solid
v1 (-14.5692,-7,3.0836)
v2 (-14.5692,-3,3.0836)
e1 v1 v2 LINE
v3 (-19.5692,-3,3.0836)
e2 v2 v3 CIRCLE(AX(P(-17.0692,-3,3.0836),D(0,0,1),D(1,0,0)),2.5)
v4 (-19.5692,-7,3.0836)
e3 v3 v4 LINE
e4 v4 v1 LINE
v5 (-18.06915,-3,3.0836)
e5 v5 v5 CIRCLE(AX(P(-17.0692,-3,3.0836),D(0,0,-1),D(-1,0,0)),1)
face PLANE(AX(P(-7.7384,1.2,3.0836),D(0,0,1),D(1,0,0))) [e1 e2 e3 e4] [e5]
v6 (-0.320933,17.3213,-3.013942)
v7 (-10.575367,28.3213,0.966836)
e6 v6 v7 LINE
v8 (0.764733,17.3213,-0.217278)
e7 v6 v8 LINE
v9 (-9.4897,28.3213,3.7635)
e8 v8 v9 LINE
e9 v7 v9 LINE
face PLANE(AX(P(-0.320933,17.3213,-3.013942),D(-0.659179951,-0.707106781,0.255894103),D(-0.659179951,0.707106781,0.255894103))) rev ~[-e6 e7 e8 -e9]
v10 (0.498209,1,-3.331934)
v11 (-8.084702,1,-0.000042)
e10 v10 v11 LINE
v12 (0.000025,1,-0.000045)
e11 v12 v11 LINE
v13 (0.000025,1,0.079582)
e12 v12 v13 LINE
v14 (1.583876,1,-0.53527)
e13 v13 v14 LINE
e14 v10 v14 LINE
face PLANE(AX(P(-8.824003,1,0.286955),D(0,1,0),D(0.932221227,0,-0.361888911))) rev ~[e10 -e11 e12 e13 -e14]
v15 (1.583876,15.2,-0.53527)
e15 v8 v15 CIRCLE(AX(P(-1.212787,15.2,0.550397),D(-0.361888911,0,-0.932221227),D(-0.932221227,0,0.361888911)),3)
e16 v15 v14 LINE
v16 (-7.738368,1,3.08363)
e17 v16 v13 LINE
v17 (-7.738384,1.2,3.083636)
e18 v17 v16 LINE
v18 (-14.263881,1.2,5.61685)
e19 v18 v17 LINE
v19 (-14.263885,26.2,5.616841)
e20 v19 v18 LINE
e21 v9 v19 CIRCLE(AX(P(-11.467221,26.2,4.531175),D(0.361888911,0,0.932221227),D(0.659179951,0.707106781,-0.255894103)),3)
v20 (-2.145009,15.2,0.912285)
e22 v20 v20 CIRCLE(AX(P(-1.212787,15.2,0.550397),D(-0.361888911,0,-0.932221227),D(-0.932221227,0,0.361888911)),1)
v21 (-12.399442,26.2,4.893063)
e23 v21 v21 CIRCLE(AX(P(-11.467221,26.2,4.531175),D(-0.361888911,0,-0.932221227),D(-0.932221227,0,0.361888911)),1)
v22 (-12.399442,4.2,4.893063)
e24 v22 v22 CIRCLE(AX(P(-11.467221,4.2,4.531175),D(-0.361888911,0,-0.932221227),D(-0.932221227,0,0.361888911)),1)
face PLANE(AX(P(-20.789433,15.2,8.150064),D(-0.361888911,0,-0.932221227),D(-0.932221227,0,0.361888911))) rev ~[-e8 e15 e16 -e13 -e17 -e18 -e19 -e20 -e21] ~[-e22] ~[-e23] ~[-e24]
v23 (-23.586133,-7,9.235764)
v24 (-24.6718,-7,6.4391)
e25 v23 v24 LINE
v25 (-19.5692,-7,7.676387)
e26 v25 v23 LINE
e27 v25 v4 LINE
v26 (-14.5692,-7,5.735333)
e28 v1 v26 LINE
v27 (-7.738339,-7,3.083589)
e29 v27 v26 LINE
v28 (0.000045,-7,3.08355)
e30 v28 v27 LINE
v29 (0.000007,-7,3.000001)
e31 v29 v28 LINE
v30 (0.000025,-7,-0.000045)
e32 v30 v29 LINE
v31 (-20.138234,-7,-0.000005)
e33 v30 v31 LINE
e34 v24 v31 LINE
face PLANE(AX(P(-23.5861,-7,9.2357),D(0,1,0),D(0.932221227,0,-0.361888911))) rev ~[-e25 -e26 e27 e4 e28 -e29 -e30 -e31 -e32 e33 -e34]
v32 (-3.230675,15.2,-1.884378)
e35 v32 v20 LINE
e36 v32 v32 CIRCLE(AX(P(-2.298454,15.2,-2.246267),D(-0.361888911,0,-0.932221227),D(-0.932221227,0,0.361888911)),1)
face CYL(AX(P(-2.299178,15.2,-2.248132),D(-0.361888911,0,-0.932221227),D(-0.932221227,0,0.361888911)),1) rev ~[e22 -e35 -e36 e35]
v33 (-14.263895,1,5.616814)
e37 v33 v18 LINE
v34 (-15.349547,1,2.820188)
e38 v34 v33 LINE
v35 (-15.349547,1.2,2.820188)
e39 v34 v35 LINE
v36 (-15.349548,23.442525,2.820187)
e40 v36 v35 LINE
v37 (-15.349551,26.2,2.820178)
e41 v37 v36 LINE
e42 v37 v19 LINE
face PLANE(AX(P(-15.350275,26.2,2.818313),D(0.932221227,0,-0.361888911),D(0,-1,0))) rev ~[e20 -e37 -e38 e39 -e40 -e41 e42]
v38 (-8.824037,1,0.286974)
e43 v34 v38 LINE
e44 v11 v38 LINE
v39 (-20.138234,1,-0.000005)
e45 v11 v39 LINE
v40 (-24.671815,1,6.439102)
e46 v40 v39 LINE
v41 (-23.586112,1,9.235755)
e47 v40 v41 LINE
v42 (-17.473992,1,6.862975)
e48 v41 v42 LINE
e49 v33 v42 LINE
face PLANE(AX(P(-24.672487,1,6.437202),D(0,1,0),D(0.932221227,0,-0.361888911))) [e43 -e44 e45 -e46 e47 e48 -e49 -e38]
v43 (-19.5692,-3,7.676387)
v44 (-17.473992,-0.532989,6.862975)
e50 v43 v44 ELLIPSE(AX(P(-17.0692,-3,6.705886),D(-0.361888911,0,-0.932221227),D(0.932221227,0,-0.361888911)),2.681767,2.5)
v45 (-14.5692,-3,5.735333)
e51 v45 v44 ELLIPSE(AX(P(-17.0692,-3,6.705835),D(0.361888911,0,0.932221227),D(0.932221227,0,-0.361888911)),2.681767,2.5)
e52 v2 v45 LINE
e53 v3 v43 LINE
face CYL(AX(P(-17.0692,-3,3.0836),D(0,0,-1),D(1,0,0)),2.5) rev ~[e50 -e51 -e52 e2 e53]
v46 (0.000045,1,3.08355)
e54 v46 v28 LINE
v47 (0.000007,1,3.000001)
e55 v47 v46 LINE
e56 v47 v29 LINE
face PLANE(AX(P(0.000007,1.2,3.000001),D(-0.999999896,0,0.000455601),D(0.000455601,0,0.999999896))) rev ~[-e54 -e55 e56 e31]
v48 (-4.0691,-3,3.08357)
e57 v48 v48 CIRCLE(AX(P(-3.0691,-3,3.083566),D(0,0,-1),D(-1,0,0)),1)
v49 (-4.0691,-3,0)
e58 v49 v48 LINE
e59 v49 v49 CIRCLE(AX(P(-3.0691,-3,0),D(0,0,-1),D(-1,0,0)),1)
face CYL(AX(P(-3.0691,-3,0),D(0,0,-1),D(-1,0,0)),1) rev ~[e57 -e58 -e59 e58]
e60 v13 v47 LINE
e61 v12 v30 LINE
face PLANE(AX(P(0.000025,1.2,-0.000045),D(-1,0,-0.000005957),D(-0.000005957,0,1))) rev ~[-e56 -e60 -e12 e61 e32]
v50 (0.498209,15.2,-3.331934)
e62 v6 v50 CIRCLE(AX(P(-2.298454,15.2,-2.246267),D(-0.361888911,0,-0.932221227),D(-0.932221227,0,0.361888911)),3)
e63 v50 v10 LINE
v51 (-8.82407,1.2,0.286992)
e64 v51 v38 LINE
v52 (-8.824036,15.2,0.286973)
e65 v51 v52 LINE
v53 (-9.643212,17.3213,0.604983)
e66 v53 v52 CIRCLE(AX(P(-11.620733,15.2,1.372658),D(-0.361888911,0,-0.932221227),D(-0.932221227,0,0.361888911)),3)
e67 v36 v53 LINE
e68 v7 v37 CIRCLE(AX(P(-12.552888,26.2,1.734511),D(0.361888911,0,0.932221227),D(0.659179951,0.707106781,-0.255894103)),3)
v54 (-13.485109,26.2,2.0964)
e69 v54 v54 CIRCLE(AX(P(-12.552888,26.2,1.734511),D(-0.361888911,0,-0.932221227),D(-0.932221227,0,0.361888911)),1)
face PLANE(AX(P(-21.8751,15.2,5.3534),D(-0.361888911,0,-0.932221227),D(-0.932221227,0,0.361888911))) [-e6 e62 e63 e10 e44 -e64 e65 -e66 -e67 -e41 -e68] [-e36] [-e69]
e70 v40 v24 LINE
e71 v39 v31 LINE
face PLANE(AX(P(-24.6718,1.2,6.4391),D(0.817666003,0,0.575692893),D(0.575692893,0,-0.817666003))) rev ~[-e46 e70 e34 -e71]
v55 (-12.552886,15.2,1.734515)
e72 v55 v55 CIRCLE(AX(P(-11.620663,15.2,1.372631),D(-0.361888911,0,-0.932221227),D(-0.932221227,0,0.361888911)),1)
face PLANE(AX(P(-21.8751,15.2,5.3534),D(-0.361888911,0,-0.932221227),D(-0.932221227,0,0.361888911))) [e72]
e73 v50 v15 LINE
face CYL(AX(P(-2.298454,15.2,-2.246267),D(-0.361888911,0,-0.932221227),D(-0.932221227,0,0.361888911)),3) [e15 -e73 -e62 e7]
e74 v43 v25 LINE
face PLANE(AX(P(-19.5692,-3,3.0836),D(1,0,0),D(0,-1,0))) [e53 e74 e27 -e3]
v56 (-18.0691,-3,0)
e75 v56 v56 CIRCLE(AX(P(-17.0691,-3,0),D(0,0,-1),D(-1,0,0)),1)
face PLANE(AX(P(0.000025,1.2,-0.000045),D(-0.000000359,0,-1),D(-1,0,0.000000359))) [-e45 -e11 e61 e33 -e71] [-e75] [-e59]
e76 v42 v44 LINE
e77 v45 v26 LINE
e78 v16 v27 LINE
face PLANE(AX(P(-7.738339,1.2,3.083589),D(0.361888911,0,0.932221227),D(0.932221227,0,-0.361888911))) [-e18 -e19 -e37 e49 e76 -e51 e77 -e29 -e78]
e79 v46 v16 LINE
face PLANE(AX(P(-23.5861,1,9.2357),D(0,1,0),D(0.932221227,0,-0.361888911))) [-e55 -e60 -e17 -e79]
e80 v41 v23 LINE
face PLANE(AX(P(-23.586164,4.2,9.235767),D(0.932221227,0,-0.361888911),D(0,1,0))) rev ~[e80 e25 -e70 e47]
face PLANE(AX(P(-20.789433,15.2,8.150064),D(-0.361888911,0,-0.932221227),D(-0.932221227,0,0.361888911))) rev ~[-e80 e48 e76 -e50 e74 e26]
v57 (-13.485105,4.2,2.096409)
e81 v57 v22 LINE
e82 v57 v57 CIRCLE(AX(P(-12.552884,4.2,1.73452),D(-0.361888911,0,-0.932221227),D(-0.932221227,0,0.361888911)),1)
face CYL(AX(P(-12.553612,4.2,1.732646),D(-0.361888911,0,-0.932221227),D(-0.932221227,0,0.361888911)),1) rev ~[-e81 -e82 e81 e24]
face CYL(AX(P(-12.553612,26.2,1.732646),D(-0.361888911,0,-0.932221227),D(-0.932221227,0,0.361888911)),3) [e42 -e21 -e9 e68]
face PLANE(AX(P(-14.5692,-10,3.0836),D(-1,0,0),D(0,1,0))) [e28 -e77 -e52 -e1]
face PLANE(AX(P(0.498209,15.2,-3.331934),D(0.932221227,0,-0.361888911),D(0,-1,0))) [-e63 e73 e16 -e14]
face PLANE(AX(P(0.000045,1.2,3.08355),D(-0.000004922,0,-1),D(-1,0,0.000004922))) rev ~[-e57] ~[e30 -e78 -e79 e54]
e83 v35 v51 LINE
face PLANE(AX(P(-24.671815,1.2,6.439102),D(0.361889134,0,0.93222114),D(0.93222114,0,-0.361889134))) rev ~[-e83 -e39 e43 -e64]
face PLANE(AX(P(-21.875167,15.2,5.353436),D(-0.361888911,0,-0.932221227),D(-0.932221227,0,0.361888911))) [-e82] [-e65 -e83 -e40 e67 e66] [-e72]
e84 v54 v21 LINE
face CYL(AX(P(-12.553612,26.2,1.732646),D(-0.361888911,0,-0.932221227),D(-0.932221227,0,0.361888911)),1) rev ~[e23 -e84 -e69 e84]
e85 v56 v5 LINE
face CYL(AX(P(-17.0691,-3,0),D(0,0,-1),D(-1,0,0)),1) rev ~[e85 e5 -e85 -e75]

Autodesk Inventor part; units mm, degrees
ref_plane "YZ Plane" through (0, 0, 0) normal (1, 0, 0) x (0, 1, 0)
ref_plane "XZ Plane" through (0, 0, 0) normal (0, 1, 0) x (-1, 0, 0)
ref_plane "Work Plane1" through (-20.7895, 15.2, 8.1501) normal (-0.3618889, 0, -0.9322212) x (-0.9322212, 0, 0.3618889)
sketch "Sketch2" plane through (-20.7895, 15.2, 8.1501) normal (-0.3618889, 0, -0.9322212) x (-0.9322212, 0, 0.3618889)
  circle A0 centre (-11, 0) radius 1 projected
  circle A1 centre (0, 11) radius 1 projected
  circle A2 centre (0, -11) radius 1 projected
  circle A3 centre (-11, 0) radius 3
  circle A4 centre (0, 11) radius 3
  circle A5 centre (0, -11) radius 3
  line L0 (0, 11) -> (3, 11)
  line L1 (0, -11) -> (3, -11)
  line L2 (3, -11) -> (3, 11)
  line L3 (0, 11) -> (-2.1213, 13.1213)
  line L4 (-2.1213, 13.1213) -> (-13.1213, 2.1213)
  line L5 (-13.1213, 2.1213) -> (-11, 0)
  line L6 (3, -11) -> (3, -14)
  line L7 (3, -14) -> (-14, -14)
  line L8 (-14, -14) -> (-14, 0)
  point P0 (-22.3298, -15.2)
  dimension "d6" = 6
  dimension "d4" = 6
  dimension "d5" = 6
  dimension "d7" = 3
extrude "Extrusion1" add sketch "Sketch2" along normal blind 3 contours A0 | L0 L3 A1 | L0 A4 L3 A1 | A1 L3 L0 | A1 L3 A4 L0 | L2 A5 L7 L8 A3 L4 A4 | A5 | L6 L7 A5 | A3 | A2
sketch "Sketch4" plane through (-23.5861, 1.2, 9.2357) normal (0, -1, 0) x (0.9322212, 0, -0.3618889)
  line L0 (25.9951, -3.0341) -> (28.4579, -2.8567) projected
  line L1 (27.3233, 0.0694) -> (28.4579, -2.8567) projected
  line L2 (27.3233, 0.0694) -> (25.3298, -0.0742) projected
  line L3 (25.3298, -0.0742) -> (6.5565, -7.362) projected
  line L4 (6.5565, -7.362) -> (-4.0222, -15.9035) projected
  line L5 (-2.8836, -18.8399) -> (-4.0222, -15.9035) projected
  line L6 (-2.8836, -18.8399) -> (8.0776, -9.9896) projected
  line L7 (8.0776, -9.9896) -> (25.9951, -3.0341) projected
  line L8 (17, 0) -> (0, 0) projected
  line L9 (0, 0) -> (0, -3) projected
  line L10 (17, -3) -> (0, -3) projected
  line L11 (17, 0) -> (17, -3) projected
  line L12 (6.5565, -7.362) -> (6.5565, 0)
  line L13 (17, 0) -> (0, 0) projected
  line L14 (25.3298, -0.0742) -> (24.2441, 2.7225)
  line L15 (24.2441, 2.7225) -> (17.2311, 0)
  line L16 (17, 0) -> (17, -3) projected
  line L17 (17, 0) -> (17.2311, 0)
  point P0 (6.5565, 0)
  dimension "d11" = 3
ref_plane "Work Plane2" through (-35.5643, -7, -23.7485) normal (0, -1, 0) x (0.7068322, 0, -0.7073813)
extrude "Extrusion2" add sketch "Sketch4" along normal up to surface (8.2 mm away) contours L3 L12 L10 L11 L17 L15 L14 | L12 L8 L11 L10
sketch "Sketch5" plane through (-23.5861, 1.2, 9.2357) normal (0, 1, 0) x (0.9322212, 0, -0.3618889)
  line L0 (17, 0) -> (17, 3) projected
  line L1 (17.2311, 0) -> (17, 0) projected
  line L2 (24.2441, -2.7225) -> (17.2311, 0) projected
  line L3 (25.3298, 0.0742) -> (24.2441, -2.7225) projected
  line L4 (6.5565, 7.362) -> (25.3298, 0.0742) projected
  line L5 (6.5565, 3) -> (6.5565, 7.362) projected
  line L6 (17, 3) -> (6.5565, 3) projected
  line L7 (24.2441, -2.7225) -> (17.2311, 0) projected
  line L8 (24.2441, -2.7225) -> (24.2139, -2.8004)
  line L9 (24.2139, -2.8004) -> (17, 0)
  point P0 (25.3298, 0.0742)
extrude "Extrusion3" add sketch "Sketch5" against normal up to surface (8.2 mm away) contours L1 L2 L8 L9
sketch "Sketch6" plane through (-24.6718, 1.2, 6.4391) normal (0, -1, 0) x (0.9322212, 0, -0.3618889)
  line L0 (6.5565, 0) -> (6.5565, 3) projected
  line L1 (6.5565, 3) -> (0, 3) projected
  line L2 (0, 3) -> (0, 0) projected
  line L3 (6.5565, 0) -> (0, 0) projected
  line L4 (6.5565, -4.362) -> (6.5565, 3) projected
  line L5 (6.5565, 0) -> (0, 0) projected
  line L6 (6.5565, 0) -> (6.5565, -4.362) projected
  line L7 (0, 0) -> (6.5565, -4.362)
  point P0 (25.3298, 2.9258)
extrude "Extrusion4" add sketch "Sketch6" along normal up to surface (8.2 mm away)
sketch "Sketch7" plane through (0, -7, 0) normal (0, 0, -1) x (-1, 0, 0)
  circle A0 centre (3.0691, 4) radius 1.6 projected
  circle A1 centre (17.0691, 4) radius 1.6 projected
  circle A2 centre (3.0691, 4) radius 1.6 projected
  line L0 (20.1383, 8) -> (0, 8) projected
  line L1 (20.1383, 8) -> (20.1383, 0) projected
  line L2 (0, 0) -> (20.1383, 0) projected
  line L3 (0, 8) -> (0, 0) projected
  circle A3 centre (3.0691, 4) radius 1
  circle A4 centre (17.0691, 4) radius 1
  point P0 (0, 7)
  dimension "d21" = 2
  dimension "d22" = 2
extrude "Extrusion5" cut sketch "Sketch7" against normal blind 10 contours A3 | A4
ref_plane "Work Plane3" through (-7.7384, 1.2, 3.0836) normal (0, 0, 1) x (1, 0, 0)
sketch "Sketch8" plane through (-7.7384, 1.2, 3.0836) normal (0, 0, 1) x (1, 0, 0)
  circle A0 centre (-9.3308, -4.2) radius 1 projected
  line L0 (-9.3308, -4.2) -> (-9.3308, -11.2) construction
  line L1 (-11.8308, -4.2) -> (-11.8308, -11.2)
  line L2 (-6.8308, -11.2) -> (-6.8308, -4.2)
  arc A1 (-6.8308, -4.2) -> (-11.8308, -4.2) centre (-9.3308, -4.2) ccw
  arc A2 (-11.8308, -11.2) -> (-6.8308, -11.2) centre (-9.3308, -11.2) ccw
  point P0 (7.7384, -1.2)
  point P1 (-9.3308, -7.7)
  dimension "d26" = 7
  dimension "d27" = 5
extrude "Extrusion6" cut sketch "Sketch8" along normal blind 10
sketch "Sketch9" plane through (-21.8751, 15.2, 5.3534) normal (-0.3618889, 0, -0.9322212) x (-0.9322212, 0, 0.3618889)
  circle A0 centre (-11, 0) radius 1 projected
  circle A1 centre (0, 11) radius 1 projected
  circle A2 centre (0, -11) radius 1 projected
  circle A3 centre (0, -11) radius 1
  circle A4 centre (-11, 0) radius 1
  circle A5 centre (0, 11) radius 1
  point P0 (-22.3298, -15.2)
  dimension "d30" = 2
  dimension "d31" = 2
  dimension "d32" = 2
extrude "Extrusion7" cut sketch "Sketch9" against normal blind 10
thicken "Thicken1" operation add thickness 0.2 both sides no extend neighbours yes toward (0, -1, 0) faces at (-17.878, 1.2, 2.242)
sketch "Sketch13" plane through (-21.8751, 15.2, 5.3534) normal (-0.3618889, 0, -0.9322212) x (-0.9322212, 0, 0.3618889)
  line L0 (3, -14.2) -> (3, 11) projected
  arc A0 (3, 11) -> (-2.1213, 13.1213) centre (0, 11) ccw projected
  line L1 (-2.1213, 13.1213) -> (-13.1213, 2.1213) projected
  arc A1 (-13.1213, 2.1213) -> (-14, 0) centre (-11, 0) ccw projected
  line L2 (-14, 0) -> (-14, -14.2) projected
  line L3 (-14, -14.2) -> (3, -14.2) projected
  circle A2 centre (-11, 0) radius 1 projected
  circle A3 centre (0, 11) radius 1 projected
  circle A4 centre (0, -11) radius 1 projected
  line L4 (0, -11) -> (-10, -11)
  line L5 (-11, 0) -> (-21, 0)
  line L6 (0, 11) -> (-10, 11)
  circle A5 centre (-21, 0) radius 3
  circle A6 centre (-10, -11) radius 3
  circle A7 centre (-10, 11) radius 3
  line L7 (-10, 11) -> (-10, 14)
  circle A8 centre (0, 11) radius 1 projected
  line L8 (0, 11) -> (0, 14)
  arc A9 (3, 11) -> (-2.1213, 13.1213) centre (0, 11) ccw projected
  line L9 (0, 14) -> (-10, 14)
  line L10 (-10, 11) -> (-12.1213, 13.1213)
  line L11 (-21, 0) -> (-23.1213, 2.1213)
  line L12 (-23.1213, 2.1213) -> (-12.1213, 13.1213)
  line L13 (-21, 0) -> (-24, 0)
  line L14 (-3.5565, -14.2) -> (-22.3298, -14.2) projected
  line L15 (-24, 0) -> (-24, -14.2)
  line L16 (-22.3298, -14.2) -> (-24, -14.2)
  point P0 (-22.3298, -15.2)
  dimension "d57" = 10
  dimension "d58" = 10
  dimension "d59" = 10
  dimension "d60" = 6
  dimension "d61" = 6
  dimension "d62" = 6
extrude "Extrusion11" add sketch "Sketch13" against normal up to surface (3 mm away) contours A0 L1 L6 A7 L9 | L14 L16 L15 A5 L5 L2 | L7 L10 A7 | A7 L6 L7 | L5 A5 L12 A7 L6 L1 A1 | A7 L10 L6 | A5 L13 L5 | L5 L11 A5 | L11 L13 A5
sketch "Sketch14" plane through (-21.8751, 15.2, 5.3534) normal (-0.3618889, 0, -0.9322212) x (-0.9322212, 0, 0.3618889)
  line L0 (3, -14.2) -> (3, 11) projected
  arc A0 (3, 11) -> (0, 14) centre (0, 11) ccw projected
  line L1 (0, 14) -> (-10, 14) projected
  arc A1 (-10, 14) -> (-12.1213, 13.1213) centre (-10, 11) ccw projected
  line L2 (-12.1213, 13.1213) -> (-23.1213, 2.1213) projected
  arc A2 (-23.1213, 2.1213) -> (-24, 0) centre (-21, 0) ccw projected
  line L3 (-24, 0) -> (-24, -14.2) projected
  line L4 (-24, -14.2) -> (-14.793, -14.2) projected
  line L5 (3, -14.2) -> (-14.793, -14.2) projected
  circle A3 centre (-11, 0) radius 1 projected
  circle A4 centre (0, 11) radius 1 projected
  circle A5 centre (0, -11) radius 1 projected
  circle A6 centre (-21, 0) radius 1
  circle A7 centre (0, -11) radius 1 projected
  line L6 (0, -11) -> (-10, -11)
  circle A8 centre (-10, -11) radius 1
  circle A9 centre (0, 11) radius 1 projected
  line L7 (0, 11) -> (-10, 11)
  circle A10 centre (-10, 11) radius 1
  point P0 (-22.3298, -15.2)
  dimension "d65" = 2
  dimension "d66" = 10
  dimension "d67" = 2
  dimension "d68" = 10
  dimension "d69" = 2
extrude "Extrusion12" cut sketch "Sketch14" against normal blind 4 contours A6 | A8 | A10
sketch "Sketch15" plane through (-21.8751, 15.2, 5.3534) normal (-0.3618889, 0, -0.9322212) x (-0.9322212, 0, 0.3618889)
  circle A0 centre (-10, 11) radius 1 projected
  circle A1 centre (-10, -11) radius 1 projected
  circle A2 centre (-21, 0) radius 1 projected
  line L0 (3, -14.2) -> (3, 11) projected
  arc A3 (3, 11) -> (0, 14) centre (0, 11) ccw projected
  line L1 (0, 14) -> (-10, 14) projected
  arc A4 (-10, 14) -> (-12.1213, 13.1213) centre (-10, 11) ccw projected
  line L2 (-12.1213, 13.1213) -> (-23.1213, 2.1213) projected
  arc A5 (-23.1213, 2.1213) -> (-24, 0) centre (-21, 0) ccw projected
  line L3 (-24, 0) -> (-24, -14.2) projected
  line L4 (-24, -14.2) -> (-14.793, -14.2) projected
  line L5 (3, -14.2) -> (-14.793, -14.2) projected
  circle A6 centre (-11, 0) radius 1 projected
  circle A7 centre (0, 11) radius 1 projected
  circle A8 centre (0, -11) radius 1 projected
  point P0 (-22.3298, -15.2)
extrude "Extrusion13" add sketch "Sketch15" against normal up to surface (3 mm away) contours A6 | A7 | A8
sketch "Sketch16" plane through (-21.8751, 15.2, 5.3534) normal (-0.3618889, 0, -0.9322212) x (-0.9322212, 0, 0.3618889)
  circle A0 centre (-10, 11) radius 1 projected
  circle A1 centre (-10, -11) radius 1 projected
  circle A2 centre (-21, 0) radius 1 projected
  line L0 (3, -14.2) -> (3, 11) projected
  arc A3 (3, 11) -> (0, 14) centre (0, 11) ccw projected
  line L1 (0, 14) -> (-10, 14) projected
  arc A4 (-10, 14) -> (-12.1213, 13.1213) centre (-10, 11) ccw projected
  line L2 (-12.1213, 13.1213) -> (-23.1213, 2.1213) projected
  arc A5 (-23.1213, 2.1213) -> (-24, 0) centre (-21, 0) ccw projected
  line L3 (-24, 0) -> (-24, -14.2) projected
  line L4 (-24, -14.2) -> (-14.793, -14.2) projected
  line L5 (3, -14.2) -> (-14.793, -14.2) projected
  circle A6 centre (-10, 11) radius 3
  circle A7 centre (-10, 11) radius 1 projected
  line L6 (-10, 11) -> (-7, 11)
  line L7 (-7, 11) -> (-7, -14.2)
  line L8 (3, -14.2) -> (-14.793, -14.2) projected
  point P0 (-22.3298, -15.2)
  point P1 (-10, 14)
  dimension "d74" = 6
extrude "Extrusion14" cut sketch "Sketch16" against normal blind 4 contours L5 L7 A6 L1 A3 L0
properties part number "jc_conn_1"
